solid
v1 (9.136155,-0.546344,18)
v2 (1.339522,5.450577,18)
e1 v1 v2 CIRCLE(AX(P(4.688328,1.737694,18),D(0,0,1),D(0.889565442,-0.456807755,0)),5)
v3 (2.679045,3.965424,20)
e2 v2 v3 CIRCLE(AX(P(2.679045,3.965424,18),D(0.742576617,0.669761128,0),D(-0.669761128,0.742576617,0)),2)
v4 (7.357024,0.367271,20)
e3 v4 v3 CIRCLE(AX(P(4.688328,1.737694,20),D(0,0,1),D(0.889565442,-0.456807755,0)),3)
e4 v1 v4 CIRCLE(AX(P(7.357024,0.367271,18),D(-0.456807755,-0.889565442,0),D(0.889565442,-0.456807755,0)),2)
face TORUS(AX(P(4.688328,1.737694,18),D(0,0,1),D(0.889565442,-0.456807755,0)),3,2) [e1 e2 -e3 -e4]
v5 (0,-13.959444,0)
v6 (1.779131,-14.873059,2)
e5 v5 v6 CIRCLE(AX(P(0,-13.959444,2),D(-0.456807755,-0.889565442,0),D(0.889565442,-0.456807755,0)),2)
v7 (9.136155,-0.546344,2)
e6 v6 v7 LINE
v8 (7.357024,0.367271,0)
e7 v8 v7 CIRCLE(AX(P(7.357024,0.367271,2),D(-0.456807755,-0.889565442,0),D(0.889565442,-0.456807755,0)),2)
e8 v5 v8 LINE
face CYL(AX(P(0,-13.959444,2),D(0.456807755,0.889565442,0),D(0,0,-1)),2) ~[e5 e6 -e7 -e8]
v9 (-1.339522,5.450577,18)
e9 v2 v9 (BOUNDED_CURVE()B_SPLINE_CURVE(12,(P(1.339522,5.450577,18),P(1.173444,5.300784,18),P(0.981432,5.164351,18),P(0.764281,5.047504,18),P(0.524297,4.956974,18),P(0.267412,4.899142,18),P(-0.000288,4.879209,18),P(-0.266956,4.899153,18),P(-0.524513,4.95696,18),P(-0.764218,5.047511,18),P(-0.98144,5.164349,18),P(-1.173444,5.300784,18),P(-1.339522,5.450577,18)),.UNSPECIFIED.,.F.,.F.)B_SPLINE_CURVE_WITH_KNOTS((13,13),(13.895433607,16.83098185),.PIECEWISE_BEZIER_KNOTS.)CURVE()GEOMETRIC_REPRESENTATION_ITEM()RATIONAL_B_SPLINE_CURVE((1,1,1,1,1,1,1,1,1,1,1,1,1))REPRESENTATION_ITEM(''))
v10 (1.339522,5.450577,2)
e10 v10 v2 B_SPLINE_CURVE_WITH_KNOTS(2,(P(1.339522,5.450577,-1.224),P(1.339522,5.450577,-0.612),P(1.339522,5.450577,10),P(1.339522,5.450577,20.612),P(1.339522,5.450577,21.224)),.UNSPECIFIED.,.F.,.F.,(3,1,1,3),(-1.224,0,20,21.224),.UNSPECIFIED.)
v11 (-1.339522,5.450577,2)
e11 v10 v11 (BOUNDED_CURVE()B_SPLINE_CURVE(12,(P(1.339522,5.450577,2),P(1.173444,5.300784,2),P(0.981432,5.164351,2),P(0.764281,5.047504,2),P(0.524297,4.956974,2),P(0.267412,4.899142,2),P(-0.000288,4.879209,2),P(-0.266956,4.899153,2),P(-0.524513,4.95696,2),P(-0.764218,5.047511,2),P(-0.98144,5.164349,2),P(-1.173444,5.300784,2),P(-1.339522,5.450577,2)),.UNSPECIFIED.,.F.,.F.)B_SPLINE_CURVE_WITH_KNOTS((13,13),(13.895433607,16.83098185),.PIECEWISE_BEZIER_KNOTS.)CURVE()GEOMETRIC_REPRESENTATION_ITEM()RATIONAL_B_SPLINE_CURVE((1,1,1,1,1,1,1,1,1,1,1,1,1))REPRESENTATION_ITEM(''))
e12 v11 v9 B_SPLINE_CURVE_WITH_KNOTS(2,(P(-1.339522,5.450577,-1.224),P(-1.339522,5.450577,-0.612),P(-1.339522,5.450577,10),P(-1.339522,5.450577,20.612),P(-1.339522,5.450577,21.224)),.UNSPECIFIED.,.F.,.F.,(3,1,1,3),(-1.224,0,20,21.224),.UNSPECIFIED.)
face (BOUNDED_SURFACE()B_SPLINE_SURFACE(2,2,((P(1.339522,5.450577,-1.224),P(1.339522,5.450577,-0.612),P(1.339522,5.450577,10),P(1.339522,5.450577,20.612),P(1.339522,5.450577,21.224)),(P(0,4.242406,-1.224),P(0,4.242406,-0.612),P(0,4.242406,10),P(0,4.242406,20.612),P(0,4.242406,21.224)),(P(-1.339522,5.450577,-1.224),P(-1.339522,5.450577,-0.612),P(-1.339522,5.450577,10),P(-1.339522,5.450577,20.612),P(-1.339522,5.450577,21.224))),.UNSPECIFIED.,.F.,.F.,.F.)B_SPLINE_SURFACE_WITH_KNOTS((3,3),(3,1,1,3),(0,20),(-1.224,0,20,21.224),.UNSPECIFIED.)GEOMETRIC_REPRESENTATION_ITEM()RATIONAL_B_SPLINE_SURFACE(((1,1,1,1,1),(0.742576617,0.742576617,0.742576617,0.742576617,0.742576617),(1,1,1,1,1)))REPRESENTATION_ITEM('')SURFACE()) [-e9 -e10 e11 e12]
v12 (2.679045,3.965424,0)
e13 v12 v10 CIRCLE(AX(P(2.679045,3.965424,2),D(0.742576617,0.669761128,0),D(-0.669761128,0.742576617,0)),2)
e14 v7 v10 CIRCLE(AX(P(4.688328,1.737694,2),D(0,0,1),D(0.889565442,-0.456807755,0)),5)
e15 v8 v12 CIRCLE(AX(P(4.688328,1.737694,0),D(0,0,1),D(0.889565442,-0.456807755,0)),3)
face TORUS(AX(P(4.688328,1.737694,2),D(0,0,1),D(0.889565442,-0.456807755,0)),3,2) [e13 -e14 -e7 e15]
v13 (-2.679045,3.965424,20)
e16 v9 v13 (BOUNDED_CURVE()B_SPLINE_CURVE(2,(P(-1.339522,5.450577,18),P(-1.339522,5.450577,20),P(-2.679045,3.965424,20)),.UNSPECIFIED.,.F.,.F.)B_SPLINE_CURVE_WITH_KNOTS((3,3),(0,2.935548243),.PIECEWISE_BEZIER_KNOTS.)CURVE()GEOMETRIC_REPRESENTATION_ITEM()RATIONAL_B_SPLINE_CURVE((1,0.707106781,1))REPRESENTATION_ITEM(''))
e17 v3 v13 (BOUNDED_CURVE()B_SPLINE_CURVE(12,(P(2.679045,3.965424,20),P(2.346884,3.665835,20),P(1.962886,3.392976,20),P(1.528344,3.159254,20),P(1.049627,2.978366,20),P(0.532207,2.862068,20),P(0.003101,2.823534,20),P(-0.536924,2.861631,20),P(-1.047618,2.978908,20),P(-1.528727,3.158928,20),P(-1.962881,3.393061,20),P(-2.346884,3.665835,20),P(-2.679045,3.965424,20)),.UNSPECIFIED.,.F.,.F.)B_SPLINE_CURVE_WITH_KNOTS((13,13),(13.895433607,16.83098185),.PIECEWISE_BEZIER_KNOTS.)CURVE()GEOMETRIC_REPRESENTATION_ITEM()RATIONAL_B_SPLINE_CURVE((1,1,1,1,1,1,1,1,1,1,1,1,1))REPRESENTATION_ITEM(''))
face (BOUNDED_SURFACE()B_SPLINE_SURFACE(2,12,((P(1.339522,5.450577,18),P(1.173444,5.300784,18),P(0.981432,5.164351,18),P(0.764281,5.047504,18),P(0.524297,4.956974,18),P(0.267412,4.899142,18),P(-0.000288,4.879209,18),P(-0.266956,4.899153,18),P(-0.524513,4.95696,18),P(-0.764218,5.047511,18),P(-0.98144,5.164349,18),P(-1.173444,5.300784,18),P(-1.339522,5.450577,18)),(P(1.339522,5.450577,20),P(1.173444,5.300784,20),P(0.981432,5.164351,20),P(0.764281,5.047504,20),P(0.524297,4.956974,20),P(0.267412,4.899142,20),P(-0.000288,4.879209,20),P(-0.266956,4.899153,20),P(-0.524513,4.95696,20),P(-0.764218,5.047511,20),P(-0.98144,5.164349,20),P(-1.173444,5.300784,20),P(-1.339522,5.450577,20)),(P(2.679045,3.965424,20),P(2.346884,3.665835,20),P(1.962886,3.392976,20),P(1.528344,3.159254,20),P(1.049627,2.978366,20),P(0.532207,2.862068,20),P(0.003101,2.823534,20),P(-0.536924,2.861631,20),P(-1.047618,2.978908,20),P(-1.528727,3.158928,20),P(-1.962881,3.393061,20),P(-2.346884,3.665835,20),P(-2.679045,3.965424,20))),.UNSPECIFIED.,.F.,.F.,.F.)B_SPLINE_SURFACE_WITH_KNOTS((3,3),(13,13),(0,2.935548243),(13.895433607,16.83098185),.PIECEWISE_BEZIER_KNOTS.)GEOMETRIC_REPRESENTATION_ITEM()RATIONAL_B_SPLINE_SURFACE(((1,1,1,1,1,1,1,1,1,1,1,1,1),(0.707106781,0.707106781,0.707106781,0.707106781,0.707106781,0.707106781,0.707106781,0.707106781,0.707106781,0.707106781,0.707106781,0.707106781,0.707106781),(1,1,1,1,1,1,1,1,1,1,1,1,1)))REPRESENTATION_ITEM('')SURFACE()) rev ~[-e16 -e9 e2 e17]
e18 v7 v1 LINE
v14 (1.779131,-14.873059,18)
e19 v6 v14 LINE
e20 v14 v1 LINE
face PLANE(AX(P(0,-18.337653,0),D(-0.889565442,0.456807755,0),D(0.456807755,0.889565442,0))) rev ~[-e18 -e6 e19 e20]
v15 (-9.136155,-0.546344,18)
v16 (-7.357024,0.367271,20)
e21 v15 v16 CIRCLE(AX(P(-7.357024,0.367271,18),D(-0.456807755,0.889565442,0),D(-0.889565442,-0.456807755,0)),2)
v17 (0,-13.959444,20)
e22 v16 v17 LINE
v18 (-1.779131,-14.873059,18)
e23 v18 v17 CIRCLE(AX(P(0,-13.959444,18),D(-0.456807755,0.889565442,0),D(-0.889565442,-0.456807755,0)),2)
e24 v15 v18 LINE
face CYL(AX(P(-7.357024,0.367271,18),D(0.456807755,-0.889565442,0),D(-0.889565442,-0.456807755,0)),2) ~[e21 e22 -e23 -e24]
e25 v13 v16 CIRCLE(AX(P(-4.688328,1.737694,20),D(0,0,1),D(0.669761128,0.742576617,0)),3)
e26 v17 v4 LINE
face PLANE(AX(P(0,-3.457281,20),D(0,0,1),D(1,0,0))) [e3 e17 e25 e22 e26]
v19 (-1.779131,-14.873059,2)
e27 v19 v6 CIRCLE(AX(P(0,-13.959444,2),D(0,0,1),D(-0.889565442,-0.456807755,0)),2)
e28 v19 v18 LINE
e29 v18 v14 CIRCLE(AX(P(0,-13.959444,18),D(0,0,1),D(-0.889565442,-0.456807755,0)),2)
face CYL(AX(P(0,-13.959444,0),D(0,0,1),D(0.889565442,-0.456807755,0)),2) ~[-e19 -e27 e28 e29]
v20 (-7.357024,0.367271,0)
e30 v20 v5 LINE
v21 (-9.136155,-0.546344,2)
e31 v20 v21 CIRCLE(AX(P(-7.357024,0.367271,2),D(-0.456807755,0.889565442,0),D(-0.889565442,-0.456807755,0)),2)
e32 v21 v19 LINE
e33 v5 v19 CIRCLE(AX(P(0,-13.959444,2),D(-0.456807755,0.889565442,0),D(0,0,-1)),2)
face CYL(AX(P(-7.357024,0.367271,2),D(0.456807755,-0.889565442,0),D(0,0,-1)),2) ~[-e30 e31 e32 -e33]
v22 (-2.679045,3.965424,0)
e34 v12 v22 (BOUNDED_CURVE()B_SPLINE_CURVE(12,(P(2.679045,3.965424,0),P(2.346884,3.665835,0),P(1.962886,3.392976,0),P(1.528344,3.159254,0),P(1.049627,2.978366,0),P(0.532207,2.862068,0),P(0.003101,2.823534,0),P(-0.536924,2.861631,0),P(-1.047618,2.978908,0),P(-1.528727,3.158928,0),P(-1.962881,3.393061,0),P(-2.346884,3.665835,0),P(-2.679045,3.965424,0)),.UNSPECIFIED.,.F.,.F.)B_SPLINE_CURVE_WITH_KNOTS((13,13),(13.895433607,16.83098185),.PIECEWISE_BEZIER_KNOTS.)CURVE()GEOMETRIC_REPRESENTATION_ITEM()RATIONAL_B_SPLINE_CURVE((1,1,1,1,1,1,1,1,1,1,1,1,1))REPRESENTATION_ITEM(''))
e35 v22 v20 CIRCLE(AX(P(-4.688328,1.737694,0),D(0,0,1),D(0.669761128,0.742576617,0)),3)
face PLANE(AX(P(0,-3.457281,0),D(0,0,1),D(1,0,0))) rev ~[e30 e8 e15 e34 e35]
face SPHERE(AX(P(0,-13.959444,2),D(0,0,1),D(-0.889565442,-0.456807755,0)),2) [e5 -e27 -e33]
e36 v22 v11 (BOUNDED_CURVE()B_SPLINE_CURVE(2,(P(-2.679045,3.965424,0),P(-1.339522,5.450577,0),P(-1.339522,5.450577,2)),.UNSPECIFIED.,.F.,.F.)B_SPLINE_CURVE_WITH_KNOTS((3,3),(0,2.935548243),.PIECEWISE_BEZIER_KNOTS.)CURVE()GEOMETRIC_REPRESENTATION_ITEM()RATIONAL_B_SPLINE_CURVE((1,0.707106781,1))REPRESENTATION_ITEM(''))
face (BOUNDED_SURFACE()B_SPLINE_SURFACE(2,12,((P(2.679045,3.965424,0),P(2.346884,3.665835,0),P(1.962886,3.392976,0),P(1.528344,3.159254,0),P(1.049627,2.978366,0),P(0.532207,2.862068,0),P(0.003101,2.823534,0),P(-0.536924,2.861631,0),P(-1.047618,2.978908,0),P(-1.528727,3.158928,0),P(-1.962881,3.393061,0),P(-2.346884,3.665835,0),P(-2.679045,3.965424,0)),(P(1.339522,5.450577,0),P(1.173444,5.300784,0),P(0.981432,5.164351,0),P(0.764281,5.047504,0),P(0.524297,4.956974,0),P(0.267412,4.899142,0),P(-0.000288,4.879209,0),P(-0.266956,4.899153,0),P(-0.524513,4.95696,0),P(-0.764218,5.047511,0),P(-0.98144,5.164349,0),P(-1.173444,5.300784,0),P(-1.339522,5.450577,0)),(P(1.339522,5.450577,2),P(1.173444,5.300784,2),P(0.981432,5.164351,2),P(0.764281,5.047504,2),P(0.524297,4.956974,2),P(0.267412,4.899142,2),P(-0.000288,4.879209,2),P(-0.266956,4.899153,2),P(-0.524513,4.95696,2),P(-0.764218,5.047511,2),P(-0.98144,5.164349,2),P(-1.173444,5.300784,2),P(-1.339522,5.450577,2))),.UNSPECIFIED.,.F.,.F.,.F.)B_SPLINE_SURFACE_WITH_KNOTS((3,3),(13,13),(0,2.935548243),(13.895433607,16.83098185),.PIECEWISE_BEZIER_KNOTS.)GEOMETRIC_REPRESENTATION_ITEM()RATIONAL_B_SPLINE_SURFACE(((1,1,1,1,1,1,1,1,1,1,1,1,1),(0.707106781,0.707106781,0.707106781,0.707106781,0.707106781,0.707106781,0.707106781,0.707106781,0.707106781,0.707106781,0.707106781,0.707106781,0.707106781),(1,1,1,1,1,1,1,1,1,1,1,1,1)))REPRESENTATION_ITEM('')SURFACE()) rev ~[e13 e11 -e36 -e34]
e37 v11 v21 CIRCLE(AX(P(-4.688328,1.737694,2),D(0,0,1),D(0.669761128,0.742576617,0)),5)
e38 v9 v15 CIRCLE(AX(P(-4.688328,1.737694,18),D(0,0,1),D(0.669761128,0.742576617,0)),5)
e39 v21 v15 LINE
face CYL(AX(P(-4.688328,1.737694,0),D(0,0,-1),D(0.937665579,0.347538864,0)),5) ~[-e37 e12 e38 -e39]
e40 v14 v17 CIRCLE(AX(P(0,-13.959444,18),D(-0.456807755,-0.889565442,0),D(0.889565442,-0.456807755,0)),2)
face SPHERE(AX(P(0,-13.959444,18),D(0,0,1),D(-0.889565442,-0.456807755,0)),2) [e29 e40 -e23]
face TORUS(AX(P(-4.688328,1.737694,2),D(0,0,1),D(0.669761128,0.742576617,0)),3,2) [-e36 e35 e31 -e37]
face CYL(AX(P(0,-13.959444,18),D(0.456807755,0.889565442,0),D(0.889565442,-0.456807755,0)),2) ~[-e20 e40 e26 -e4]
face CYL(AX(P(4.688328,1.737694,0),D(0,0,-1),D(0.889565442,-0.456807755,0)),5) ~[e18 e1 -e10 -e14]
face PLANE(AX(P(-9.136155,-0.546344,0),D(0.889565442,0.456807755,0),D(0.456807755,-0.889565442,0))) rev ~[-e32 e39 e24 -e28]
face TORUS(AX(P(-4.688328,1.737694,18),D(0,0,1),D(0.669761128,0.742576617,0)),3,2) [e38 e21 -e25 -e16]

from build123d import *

# Parameters (mm, degrees)
F1_DEPTH = 20
F2_F1_R  = 2
F2_F2_R  = 2
F2_F3_R  = 2


with BuildPart() as f1:
    # F0 (on Top) → F1 (new body)
    with BuildSketch(Plane.XY):
        with BuildLine():
            ThreePointArc((0, 3.4753886408), (-6.702786735, 6.3139324677), (-9.1361551027, -0.5463444553))
            Line((-9.1361551027, -0.5463444553), (0, -18.3376532868))
            Line((0, -18.3376532868), (9.1361551027, -0.5463444553))
            ThreePointArc((9.1361551027, -0.5463444553), (6.702786735, 6.3139324677), (0, 3.4753886408))
        make_face()
        with BuildLine():
            ThreePointArc((0, 0), (-0.3116721052, 1.7376943204), (0, 3.4753886408))
            ThreePointArc((0, 3.4753886408), (0.3116721052, 1.7376943204), (0, 0))
        make_face(mode=Mode.SUBTRACT)
        with BuildLine():
            ThreePointArc((0, 0), (0.3116721052, 1.7376943204), (0, 3.4753886408))
            ThreePointArc((0, 3.4753886408), (-0.3116721052, 1.7376943204), (0, 0))
        make_face()
    extrude(amount=F1_DEPTH)

    # F2: fillet of radius 2 on 7 edges, made by hand

    # F2_f1
    f2_f1_edges = [f1.edges().sort_by_distance(p)[0] for p in [
        (0, 3.4753886408, 10),
    ]]
    fillet(f2_f1_edges, radius=F2_F1_R)

    # F2_f2
    f2_f2_edges = [f1.edges().sort_by_distance(p)[0] for p in [
        (0, -18.3376532868, 10),
    ]]
    fillet(f2_f2_edges, radius=F2_F2_R)

    # F2_f3
    f2_f3_edges = [f1.edges().sort_by_distance(p)[0] for p in [
        (7.7367258426, 5.7009341506, 0),
        (7.7367258426, 5.7009341506, 20),
        (5.4576429929, -7.7097019344, 0),
        (5.4576429929, -7.7097019344, 20),
        (0, -15.9594439033, 20),
        (0, -15.9594439033, 0),
        (1e-10, 4.9357306327, 20),
        (1e-10, 4.9357306327, 0),
    ]]
    fillet(f2_f3_edges, radius=F2_F3_R)


solid = f1.part
